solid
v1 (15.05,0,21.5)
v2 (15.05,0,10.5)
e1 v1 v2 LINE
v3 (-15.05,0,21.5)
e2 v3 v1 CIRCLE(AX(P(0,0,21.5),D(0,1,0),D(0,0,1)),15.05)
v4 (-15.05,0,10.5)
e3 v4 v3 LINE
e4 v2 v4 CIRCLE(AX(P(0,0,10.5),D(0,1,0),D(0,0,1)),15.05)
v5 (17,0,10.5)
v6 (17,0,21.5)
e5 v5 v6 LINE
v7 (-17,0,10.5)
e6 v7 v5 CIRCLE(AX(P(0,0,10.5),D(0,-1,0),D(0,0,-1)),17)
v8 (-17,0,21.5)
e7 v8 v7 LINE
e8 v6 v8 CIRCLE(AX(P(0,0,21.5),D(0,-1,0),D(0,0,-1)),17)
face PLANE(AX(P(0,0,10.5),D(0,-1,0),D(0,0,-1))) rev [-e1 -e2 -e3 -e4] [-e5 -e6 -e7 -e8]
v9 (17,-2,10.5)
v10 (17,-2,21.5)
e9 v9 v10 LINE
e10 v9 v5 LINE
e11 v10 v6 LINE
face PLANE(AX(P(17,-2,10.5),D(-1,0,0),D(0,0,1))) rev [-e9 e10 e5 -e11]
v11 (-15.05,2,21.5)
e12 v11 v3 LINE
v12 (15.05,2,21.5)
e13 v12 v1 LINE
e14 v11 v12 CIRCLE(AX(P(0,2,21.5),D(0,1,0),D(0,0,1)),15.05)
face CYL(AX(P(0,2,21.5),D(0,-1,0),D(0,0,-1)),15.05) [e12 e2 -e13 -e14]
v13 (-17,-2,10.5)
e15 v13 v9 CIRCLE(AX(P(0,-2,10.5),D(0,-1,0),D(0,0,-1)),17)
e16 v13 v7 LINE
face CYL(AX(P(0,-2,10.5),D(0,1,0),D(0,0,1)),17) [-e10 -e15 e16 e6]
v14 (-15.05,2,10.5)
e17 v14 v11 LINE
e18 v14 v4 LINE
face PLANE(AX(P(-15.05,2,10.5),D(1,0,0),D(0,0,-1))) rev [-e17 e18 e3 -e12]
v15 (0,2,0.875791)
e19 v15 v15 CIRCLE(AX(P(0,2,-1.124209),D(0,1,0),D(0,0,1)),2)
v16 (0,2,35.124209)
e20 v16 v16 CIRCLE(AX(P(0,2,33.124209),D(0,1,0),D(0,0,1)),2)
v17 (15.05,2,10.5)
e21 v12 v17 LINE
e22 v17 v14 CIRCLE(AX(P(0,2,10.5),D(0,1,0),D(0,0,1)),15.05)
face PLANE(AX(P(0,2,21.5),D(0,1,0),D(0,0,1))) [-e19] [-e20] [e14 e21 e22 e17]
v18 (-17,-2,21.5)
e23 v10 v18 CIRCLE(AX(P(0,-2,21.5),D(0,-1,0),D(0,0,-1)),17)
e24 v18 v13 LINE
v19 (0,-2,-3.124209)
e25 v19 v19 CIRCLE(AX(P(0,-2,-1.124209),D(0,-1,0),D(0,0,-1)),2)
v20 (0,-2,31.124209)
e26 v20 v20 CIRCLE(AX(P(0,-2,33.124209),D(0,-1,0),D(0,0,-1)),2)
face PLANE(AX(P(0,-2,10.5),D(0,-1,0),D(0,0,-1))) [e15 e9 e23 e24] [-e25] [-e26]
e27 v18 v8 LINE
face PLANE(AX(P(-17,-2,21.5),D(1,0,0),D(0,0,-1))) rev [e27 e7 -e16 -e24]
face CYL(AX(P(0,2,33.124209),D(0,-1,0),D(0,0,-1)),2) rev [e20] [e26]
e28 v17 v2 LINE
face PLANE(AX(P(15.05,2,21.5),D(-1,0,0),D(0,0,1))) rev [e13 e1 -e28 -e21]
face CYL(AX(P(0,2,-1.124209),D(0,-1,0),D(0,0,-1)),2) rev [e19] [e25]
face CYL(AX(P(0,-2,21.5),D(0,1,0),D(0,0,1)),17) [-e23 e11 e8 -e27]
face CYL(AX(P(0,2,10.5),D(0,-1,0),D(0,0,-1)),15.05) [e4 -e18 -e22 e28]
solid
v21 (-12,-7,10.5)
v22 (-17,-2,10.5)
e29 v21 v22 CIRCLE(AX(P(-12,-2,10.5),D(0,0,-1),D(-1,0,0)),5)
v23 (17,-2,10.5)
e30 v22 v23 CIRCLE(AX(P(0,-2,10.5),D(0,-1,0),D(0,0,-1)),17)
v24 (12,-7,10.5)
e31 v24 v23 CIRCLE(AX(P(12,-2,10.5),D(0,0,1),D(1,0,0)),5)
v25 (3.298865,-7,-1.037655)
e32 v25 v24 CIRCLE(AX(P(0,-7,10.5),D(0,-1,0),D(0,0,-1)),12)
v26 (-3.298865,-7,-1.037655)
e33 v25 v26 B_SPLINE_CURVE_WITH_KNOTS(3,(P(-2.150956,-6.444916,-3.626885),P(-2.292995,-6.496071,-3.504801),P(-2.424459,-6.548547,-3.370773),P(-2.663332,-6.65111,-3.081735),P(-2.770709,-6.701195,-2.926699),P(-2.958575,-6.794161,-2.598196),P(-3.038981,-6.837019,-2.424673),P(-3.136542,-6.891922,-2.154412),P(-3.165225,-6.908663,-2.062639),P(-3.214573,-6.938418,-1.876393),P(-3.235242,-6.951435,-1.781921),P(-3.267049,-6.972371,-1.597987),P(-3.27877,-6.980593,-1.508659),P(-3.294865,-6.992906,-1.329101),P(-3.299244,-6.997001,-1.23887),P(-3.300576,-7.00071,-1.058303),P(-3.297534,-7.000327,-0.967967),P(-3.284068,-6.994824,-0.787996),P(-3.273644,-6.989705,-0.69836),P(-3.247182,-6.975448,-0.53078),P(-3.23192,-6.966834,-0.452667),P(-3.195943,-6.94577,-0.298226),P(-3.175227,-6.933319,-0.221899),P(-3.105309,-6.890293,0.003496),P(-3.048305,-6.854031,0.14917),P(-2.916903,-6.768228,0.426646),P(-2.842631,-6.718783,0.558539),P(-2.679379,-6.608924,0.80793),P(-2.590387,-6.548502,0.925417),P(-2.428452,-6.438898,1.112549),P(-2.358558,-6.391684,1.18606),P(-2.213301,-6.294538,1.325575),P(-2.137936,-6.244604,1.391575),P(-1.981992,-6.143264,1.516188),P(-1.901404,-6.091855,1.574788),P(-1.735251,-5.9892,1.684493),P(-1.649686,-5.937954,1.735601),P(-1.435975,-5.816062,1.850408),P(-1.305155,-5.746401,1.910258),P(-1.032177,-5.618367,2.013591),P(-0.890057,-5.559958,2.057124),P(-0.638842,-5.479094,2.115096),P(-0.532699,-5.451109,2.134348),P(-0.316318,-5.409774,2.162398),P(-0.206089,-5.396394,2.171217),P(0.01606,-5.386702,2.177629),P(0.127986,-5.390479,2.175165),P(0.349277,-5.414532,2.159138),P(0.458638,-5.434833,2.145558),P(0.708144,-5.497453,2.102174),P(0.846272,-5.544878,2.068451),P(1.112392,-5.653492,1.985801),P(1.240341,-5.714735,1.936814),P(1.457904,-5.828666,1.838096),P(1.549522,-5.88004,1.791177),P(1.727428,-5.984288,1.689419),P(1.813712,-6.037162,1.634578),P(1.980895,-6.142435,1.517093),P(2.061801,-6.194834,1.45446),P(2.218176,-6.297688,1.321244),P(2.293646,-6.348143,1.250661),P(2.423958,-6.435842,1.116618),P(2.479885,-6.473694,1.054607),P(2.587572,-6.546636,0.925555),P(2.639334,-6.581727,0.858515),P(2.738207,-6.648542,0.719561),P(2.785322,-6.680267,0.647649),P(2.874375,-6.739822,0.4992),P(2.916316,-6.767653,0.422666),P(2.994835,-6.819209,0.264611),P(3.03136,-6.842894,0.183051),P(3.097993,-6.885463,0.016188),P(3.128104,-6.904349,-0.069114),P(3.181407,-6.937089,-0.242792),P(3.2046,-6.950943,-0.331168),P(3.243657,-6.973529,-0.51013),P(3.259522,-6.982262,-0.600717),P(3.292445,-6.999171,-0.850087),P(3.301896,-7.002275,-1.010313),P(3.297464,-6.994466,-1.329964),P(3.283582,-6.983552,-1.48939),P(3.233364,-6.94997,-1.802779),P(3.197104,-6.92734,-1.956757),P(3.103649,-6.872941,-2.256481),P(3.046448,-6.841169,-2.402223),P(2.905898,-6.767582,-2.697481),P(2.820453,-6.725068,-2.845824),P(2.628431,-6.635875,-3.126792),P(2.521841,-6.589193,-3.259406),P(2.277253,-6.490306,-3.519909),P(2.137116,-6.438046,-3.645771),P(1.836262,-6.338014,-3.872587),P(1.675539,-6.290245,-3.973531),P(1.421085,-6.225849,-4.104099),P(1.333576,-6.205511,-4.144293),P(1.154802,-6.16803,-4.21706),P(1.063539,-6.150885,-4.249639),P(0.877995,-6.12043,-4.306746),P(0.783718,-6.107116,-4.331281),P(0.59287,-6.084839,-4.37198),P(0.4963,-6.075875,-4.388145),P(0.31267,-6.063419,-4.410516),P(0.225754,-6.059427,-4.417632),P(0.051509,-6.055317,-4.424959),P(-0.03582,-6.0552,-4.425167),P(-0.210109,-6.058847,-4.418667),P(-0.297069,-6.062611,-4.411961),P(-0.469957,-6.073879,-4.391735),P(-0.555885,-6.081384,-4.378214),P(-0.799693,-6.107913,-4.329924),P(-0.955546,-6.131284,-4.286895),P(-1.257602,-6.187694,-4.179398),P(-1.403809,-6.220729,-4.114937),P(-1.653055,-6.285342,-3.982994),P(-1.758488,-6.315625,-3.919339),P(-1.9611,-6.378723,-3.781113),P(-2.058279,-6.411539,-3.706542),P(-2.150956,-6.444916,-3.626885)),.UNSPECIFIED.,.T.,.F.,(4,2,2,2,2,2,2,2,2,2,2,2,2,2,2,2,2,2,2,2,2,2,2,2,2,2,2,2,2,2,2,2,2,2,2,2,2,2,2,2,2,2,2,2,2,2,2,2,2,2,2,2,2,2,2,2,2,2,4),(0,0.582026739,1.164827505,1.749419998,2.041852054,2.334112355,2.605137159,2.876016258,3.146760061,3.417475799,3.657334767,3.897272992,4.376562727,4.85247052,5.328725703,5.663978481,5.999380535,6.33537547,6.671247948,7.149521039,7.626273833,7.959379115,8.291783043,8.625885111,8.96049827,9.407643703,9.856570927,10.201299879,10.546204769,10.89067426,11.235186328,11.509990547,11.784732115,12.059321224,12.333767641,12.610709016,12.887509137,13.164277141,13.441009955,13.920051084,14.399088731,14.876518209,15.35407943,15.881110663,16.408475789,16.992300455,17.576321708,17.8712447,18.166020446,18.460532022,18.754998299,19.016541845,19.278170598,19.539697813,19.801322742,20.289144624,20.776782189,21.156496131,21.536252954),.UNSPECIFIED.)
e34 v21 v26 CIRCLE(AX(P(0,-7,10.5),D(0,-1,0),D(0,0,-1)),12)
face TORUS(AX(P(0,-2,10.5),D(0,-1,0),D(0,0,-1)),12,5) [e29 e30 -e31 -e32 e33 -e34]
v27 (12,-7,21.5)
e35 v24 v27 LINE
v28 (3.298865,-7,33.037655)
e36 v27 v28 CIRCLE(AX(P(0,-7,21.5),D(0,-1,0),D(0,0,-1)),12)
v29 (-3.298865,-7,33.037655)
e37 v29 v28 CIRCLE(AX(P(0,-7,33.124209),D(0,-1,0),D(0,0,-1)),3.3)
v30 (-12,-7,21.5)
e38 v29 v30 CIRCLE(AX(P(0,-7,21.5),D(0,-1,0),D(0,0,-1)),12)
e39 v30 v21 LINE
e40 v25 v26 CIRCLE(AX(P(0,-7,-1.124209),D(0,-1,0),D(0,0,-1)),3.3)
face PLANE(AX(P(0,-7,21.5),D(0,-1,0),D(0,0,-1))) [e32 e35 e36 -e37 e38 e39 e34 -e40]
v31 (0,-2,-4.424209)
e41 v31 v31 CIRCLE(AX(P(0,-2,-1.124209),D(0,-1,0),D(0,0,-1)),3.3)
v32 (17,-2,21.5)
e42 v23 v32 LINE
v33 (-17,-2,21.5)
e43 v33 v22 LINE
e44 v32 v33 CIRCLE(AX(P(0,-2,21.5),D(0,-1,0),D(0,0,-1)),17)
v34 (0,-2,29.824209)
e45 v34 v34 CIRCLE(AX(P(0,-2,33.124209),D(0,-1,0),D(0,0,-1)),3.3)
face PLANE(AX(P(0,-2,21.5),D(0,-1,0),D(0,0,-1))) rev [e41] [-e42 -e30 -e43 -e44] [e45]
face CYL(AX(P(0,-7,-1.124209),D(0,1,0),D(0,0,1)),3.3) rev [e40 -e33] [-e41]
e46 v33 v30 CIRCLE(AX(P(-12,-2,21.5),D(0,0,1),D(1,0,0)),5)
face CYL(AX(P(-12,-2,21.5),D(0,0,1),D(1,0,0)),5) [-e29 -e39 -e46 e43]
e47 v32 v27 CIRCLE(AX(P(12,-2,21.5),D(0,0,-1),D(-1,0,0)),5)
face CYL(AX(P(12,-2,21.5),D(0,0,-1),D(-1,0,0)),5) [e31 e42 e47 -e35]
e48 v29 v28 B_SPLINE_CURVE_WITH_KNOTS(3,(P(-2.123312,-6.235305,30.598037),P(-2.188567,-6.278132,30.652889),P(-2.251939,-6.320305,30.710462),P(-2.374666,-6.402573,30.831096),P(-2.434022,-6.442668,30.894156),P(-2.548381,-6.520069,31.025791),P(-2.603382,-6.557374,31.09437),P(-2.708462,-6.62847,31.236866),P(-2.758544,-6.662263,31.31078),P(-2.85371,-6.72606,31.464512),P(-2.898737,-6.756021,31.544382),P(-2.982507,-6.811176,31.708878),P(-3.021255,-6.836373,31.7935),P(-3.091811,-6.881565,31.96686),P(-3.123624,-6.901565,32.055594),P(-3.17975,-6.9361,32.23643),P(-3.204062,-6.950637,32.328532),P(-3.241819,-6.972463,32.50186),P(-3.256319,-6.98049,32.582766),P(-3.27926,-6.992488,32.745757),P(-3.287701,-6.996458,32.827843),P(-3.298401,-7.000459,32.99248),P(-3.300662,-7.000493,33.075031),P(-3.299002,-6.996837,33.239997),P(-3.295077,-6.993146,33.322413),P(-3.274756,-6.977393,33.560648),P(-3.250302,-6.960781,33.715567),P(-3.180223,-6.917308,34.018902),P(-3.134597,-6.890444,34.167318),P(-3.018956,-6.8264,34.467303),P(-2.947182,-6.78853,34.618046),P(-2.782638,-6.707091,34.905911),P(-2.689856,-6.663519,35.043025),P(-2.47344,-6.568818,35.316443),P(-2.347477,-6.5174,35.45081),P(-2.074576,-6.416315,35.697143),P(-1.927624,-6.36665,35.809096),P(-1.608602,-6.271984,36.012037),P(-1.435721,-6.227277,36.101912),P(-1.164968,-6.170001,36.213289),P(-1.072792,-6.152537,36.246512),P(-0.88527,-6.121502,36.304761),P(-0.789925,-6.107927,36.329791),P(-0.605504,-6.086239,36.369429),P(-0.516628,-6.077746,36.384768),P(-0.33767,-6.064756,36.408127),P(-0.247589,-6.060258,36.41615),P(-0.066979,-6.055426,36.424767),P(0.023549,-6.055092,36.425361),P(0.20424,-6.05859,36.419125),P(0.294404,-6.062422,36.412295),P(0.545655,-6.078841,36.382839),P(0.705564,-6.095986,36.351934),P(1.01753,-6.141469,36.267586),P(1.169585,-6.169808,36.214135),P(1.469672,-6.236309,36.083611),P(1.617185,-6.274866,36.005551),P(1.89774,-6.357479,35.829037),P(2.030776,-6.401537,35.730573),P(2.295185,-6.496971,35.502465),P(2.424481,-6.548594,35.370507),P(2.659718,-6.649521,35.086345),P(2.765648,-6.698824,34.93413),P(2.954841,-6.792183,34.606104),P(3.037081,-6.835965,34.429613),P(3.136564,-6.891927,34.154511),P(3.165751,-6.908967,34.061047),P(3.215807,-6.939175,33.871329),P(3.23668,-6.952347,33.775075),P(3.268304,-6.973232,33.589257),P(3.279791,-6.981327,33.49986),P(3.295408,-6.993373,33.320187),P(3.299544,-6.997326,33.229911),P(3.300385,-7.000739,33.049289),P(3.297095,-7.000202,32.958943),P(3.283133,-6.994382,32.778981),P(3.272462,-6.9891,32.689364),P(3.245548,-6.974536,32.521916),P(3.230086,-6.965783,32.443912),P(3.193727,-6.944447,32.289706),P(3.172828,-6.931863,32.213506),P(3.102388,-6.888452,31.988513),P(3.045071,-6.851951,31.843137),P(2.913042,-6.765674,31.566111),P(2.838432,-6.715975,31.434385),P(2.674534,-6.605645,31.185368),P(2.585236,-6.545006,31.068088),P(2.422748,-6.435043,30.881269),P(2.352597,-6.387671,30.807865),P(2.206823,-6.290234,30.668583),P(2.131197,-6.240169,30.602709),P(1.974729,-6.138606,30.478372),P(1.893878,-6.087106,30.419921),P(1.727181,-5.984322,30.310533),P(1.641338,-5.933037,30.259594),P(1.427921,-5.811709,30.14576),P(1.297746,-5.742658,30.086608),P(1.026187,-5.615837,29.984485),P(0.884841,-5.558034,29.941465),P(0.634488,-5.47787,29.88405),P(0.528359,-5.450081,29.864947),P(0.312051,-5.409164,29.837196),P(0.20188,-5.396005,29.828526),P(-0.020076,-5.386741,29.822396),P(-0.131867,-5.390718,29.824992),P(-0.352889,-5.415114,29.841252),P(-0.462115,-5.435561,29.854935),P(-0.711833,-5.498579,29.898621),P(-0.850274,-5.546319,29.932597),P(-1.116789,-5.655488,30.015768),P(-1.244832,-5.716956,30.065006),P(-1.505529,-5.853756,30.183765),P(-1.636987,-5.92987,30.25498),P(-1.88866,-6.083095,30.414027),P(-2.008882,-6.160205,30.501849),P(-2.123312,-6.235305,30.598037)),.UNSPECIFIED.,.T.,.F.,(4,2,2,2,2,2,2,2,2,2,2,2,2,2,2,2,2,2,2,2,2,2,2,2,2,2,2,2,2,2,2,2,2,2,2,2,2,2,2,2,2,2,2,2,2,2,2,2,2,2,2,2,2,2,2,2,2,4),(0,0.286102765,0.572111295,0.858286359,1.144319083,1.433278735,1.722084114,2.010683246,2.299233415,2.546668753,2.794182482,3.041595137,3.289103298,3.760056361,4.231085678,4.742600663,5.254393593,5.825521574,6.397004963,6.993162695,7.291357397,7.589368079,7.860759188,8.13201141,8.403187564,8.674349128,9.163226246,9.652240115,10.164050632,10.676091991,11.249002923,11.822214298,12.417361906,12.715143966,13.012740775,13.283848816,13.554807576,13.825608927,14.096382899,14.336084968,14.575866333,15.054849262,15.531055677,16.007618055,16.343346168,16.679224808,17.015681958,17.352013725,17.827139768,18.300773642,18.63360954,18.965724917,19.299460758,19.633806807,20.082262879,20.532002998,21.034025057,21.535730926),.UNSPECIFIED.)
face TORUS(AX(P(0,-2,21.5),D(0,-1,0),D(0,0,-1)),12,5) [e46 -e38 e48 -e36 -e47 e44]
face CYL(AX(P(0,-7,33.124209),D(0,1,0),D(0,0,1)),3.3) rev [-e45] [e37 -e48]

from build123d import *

# Parameters (mm, degrees)
SKETCH1_R           = 2
BOSS_EXTRUDE1_DEPTH = 2
BOSS_EXTRUDE2_DEPTH = 2
BOSS_EXTRUDE3_DEPTH = 5
FILLET2_R           = 5
CUT_EXTRUDE1_START  = -7
SKETCH4_R           = 2
CUT_EXTRUDE1_DEPTH  = 7
SKETCH5_R           = 3.3
CUT_EXTRUDE2_DEPTH  = 5


with BuildPart() as part:
    # Sketch1 → Boss-Extrude1 (new body)
    with BuildSketch(Plane(origin=(0, 0, 0), x_dir=(1, 0, 0), z_dir=(0, 1, 0))):
        with BuildLine():
            Line((15.05, -21.5), (15.05, -10.5))
            ThreePointArc((15.05, -10.5), (0, 4.549999995), (-15.05, -10.5))
            Line((-15.05, -10.5), (-15.05, -21.5))
            ThreePointArc((-15.05, -21.5), (0, -36.55), (15.05, -21.5))
        make_face()
        with Locations(Location((0, 1.124208827, 0), (0, 0, 270))):
            Circle(SKETCH1_R, mode=Mode.SUBTRACT)
        with Locations(Location((0, -33.124208832, 0), (0, 0, 270))):
            Circle(SKETCH1_R, mode=Mode.SUBTRACT)
    extrude(amount=BOSS_EXTRUDE1_DEPTH)

    # Sketch2 → Boss-Extrude2 (add)
    with BuildSketch(Plane.XZ):
        with BuildLine():
            Line((17, 10.499999999), (17, 21.5))
            ThreePointArc((17, 21.5), (0, 38.5), (-17, 21.5))
            Line((-17, 21.5), (-17, 10.5))
            ThreePointArc((-17, 10.5), (0, -6.499999995), (17, 10.499999999))
        make_face()
    extrude(amount=BOSS_EXTRUDE2_DEPTH)


with BuildPart() as body_2:
    # Sketch3 → Boss-Extrude3 (new body)
    with BuildSketch(Plane.XZ.offset(2)):
        with BuildLine():
            Line((-17, 21.5), (-17, 10.500000005))
            ThreePointArc((-17, 10.500000005), (0, -6.499999995), (17, 10.500000005))
            Line((17, 10.500000005), (17, 21.5))
            ThreePointArc((17, 21.5), (0, 38.5), (-17, 21.5))
        make_face()
    extrude(amount=BOSS_EXTRUDE3_DEPTH)

    # Fillet2
    fillet2_edges = [body_2.edges().sort_by_distance(p)[0] for p in [
        (17, -7, 16.000000003),
        (-17, -7, 16.000000003),
        (0, -7, -6.499999995),
        (0, -7, 38.5),
    ]]
    fillet(fillet2_edges, radius=FILLET2_R - 0.0001)  # a hair under: the kernel refuses the full size


with BuildPart() as cut_extrude1_tool:
    # Sketch4 → Cut-Extrude1 (new body)
    with BuildSketch(Plane(origin=(0, 0, 0), x_dir=(1, 0, 0), z_dir=(0, 1, 0)).offset(CUT_EXTRUDE1_START)):
        with Locations(Location((0, 1.124208827, 0), (0, 0, 173.978283806))):
            Circle(SKETCH4_R)
        with Locations(Location((0, -33.124208832, 0), (0, 0, 353.978283806))):
            Circle(SKETCH4_R)
    extrude(amount=CUT_EXTRUDE1_DEPTH)


with BuildPart() as part_1:
    add(part.part)

    # Cut-Extrude1: cut by cut_extrude1_tool
    add(cut_extrude1_tool.part, mode=Mode.SUBTRACT)


with BuildPart() as body_2_1:
    add(body_2.part)

    # Cut-Extrude1: cut by cut_extrude1_tool
    add(cut_extrude1_tool.part, mode=Mode.SUBTRACT)

    # Sketch5 → Cut-Extrude2 (cut)
    with BuildSketch(Plane.XZ.offset(2)):
        with Locations(Location((0, 33.124208832, 0), (0, 0, 358.49705556))):
            Circle(SKETCH5_R)
        with Locations(Location((0, -1.124208827, 0), (0, 0, 1.50294444))):
            Circle(SKETCH5_R)
    extrude(amount=CUT_EXTRUDE2_DEPTH, mode=Mode.SUBTRACT)


solid = Compound([part_1.part, body_2_1.part])
